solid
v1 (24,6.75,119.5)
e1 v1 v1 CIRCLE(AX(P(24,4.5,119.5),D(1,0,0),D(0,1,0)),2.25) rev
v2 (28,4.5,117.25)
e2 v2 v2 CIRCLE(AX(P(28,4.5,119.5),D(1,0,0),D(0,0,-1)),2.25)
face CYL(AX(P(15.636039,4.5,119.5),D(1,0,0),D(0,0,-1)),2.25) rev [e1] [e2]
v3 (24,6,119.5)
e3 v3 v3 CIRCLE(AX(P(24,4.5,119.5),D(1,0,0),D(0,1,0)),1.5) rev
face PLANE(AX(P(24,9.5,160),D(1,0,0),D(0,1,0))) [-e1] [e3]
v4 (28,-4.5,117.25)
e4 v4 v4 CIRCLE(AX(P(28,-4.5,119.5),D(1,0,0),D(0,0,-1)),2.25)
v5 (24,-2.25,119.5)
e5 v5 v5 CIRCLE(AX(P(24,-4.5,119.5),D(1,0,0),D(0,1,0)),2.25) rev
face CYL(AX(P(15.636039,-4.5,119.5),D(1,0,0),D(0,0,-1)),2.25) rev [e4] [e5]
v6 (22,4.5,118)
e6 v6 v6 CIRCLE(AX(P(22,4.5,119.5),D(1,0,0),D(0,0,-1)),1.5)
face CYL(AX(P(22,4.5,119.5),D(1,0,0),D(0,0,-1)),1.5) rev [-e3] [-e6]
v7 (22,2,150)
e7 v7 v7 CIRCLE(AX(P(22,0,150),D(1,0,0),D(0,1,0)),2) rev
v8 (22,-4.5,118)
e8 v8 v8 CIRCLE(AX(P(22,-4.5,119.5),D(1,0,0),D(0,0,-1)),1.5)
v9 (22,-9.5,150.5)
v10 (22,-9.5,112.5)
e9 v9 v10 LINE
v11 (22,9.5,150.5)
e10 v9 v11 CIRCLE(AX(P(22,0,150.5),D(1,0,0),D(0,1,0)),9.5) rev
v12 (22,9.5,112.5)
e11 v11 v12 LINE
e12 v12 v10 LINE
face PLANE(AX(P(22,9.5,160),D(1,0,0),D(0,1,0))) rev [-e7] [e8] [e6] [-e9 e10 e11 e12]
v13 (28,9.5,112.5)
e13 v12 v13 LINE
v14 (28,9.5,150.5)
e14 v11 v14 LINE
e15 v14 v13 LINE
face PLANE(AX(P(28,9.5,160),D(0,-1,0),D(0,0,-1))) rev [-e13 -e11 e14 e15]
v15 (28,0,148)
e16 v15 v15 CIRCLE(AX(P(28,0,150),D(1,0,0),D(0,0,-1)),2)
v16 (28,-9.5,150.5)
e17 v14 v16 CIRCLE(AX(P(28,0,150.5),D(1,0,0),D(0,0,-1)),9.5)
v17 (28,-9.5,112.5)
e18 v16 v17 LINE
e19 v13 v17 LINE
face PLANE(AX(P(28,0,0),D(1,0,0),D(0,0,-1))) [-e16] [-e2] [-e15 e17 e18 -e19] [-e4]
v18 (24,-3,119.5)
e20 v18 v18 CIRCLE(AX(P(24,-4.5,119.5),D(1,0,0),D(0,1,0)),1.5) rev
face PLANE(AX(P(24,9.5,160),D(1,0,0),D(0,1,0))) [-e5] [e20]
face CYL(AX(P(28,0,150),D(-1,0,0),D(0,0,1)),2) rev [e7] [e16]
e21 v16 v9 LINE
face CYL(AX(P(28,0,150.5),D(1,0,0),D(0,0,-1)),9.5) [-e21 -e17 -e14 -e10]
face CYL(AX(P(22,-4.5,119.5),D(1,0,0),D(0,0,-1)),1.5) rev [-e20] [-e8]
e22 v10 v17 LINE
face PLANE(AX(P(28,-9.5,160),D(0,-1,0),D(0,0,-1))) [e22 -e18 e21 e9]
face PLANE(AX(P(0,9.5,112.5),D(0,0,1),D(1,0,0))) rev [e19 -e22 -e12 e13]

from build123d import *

# Parameters (mm, degrees)
SKETCH_1_W            = 250
SKETCH_1_H            = 29
SKETCH_1_W_2          = 30
SKETCH_1_H_2          = 15
EXTRUDE_1_DEPTH       = 28
SKETCH_1_3_R          = 2
CUT_EXTRUDE_1_DEPTH   = 132.450561049
CUT_EXTRUDE_START     = 2
SKETCH_1_5_R          = 2
CUT_EXTRUDE_2_DEPTH   = 24
SKETCH_3_W            = 6
SKETCH_3_H            = 19
EXTRUDE_2_DEPTH       = 35
SKETCH_3_3_W          = 6
SKETCH_3_3_H          = 19
EXTRUDE_3_DEPTH       = 35
SKETCH_1_6_R          = 2
CUT_EXTRUDE_3_DEPTH   = 166.088612569
CUT_EXTRUDE_7_REACH   = 167.089
SKETCH_1_8_R          = 3.1
FILLET_1_R            = 9.5
FILLET_2_R            = 5
SKETCH_4_R            = 5.1
CUT_EXTRUDE_4_DEPTH   = 31.5
SKETCH_4_2_OUTSIDE_W  = 87.946
SKETCH_4_2_OUTSIDE_H  = 103.946
SKETCH_4_2_OUTSIDE_R  = 5.1
CUT_EXTRUDE_5_DEPTH   = 21.5
SKETCH_5_OUTSIDE_W    = 83.722
SKETCH_5_OUTSIDE_H    = 99.722
SKETCH_5_OUTSIDE_W_2  = 23.8
SKETCH_5_OUTSIDE_H_2  = 24.8
CUT_EXTRUDE_6_DEPTH   = 18
SKETCH_6_R            = 0.75
CUT_EXTRUDE_8_DEPTH   = 4
SKETCH_7_R            = 0.75
CUT_EXTRUDE_9_DEPTH   = 4
SKETCH_8_R            = 0.75
CUT_EXTRUDE_10_DEPTH  = 4
SKETCH_9_R            = 0.75
CUT_EXTRUDE_11_DEPTH  = 4
SKETCH_11_R           = 0.75
CUT_EXTRUDE_12_DEPTH  = 166.088612569
SKETCH_10_R           = 2
CUT_EXTRUDE_14_DEPTH  = 166.088612569
SKETCH_10_5_R         = 0.75
CUT_EXTRUDE_15_DEPTH  = 4.1
CUT_EXTRUDE_START_2   = -23.9
SKETCH_10_6_R         = 0.75
CUT_EXTRUDE_16_DEPTH  = 4.1
SKETCH_13_W           = 19.8
SKETCH_13_H           = 40
CUT_EXTRUDE_17_DEPTH  = 4.1
SKETCH_14_W           = 19.8
SKETCH_14_H           = 10
CUT_EXTRUDE_18_DEPTH  = 4.1
CUT_EXTRUDE_19_DEPTH  = 166.088612569
SKETCH_16_W           = 16
SKETCH_16_H           = 2.5
SKETCH_16_H_2         = 12.5
CUT_EXTRUDE_20_DEPTH  = 3
SKETCH_18_OUTSIDE_W   = 207.564
SKETCH_18_OUTSIDE_H   = 81.564
SKETCH_18_OUTSIDE_W_2 = 47.5
SKETCH_18_OUTSIDE_H_2 = 19
CUT_EXTRUDE_21_DEPTH  = 166.088612569
CUT_EXTRUDE_START_3   = -6
SKETCH_18_4_W         = 47.5
SKETCH_18_4_H         = 19
CUT_EXTRUDE_22_DEPTH  = 157.709096242
SKETCH_18_5_R         = 1.5
CUT_EXTRUDE_23_DEPTH  = 161.394046024
SKETCH_18_6_R         = 2.25
CUT_EXTRUDE_24_DEPTH  = 4


with BuildPart() as part:
    # 草图1 → 凸台-拉伸1 (new body)
    with BuildSketch(Plane(origin=(0, 0, 0), x_dir=(0, 0, -1), z_dir=(1, 0, 0))):
        Rectangle(SKETCH_1_W, SKETCH_1_H)
        with Locations((-60, 22)):
            Rectangle(SKETCH_1_W_2, SKETCH_1_H_2)
        with Locations((0, 22)):
            Rectangle(SKETCH_1_W_2, SKETCH_1_H_2)
        with Locations((60, 22)):
            Rectangle(SKETCH_1_W_2, SKETCH_1_H_2)
    extrude(amount=EXTRUDE_1_DEPTH)

    # 草图1<3> → 切除-拉伸1 (cut, through all)
    with BuildSketch(Plane(origin=(0, 0, 0), x_dir=(0, 0, -1), z_dir=(1, 0, 0))):
        with Locations((-67.5, -10.858617882)):
            Circle(SKETCH_1_3_R)
        with Locations((-22.5, -10.858617882)):
            Circle(SKETCH_1_3_R)
        with Locations((22.5, -10.858617882)):
            Circle(SKETCH_1_3_R)
        with Locations((-60, 25.5)):
            Circle(SKETCH_1_3_R)
        with Locations((67.5, -10.858617882)):
            Circle(SKETCH_1_3_R)
        with Locations((0, 25.5)):
            Circle(SKETCH_1_3_R)
        with Locations((60, 25.5)):
            Circle(SKETCH_1_3_R)
    extrude(amount=CUT_EXTRUDE_1_DEPTH, mode=Mode.SUBTRACT)

    # 草图1<5> → 切除-拉伸2 (cut)
    # profile 1 of 7: a face of its own
    with BuildSketch(Plane(origin=(0, 0, 0), x_dir=(0, 0, -1), z_dir=(1, 0, 0)).offset(CUT_EXTRUDE_START)):
        with BuildLine():
            Line((-72.5, 29.5), (-72.5, 25.5))
            ThreePointArc((-72.5, 25.5), (-60, 13), (-47.5, 25.5))
            Line((-47.5, 25.5), (-47.5, 29.5))
            Line((-47.5, 29.5), (-72.5, 29.5))
        make_face()
        with Locations((-60, 25.5)):
            Circle(SKETCH_1_5_R, mode=Mode.SUBTRACT)
    # profile 2 of 7: a face of its own
    with BuildSketch(Plane(origin=(0, 0, 0), x_dir=(0, 0, -1), z_dir=(1, 0, 0)).offset(CUT_EXTRUDE_START)):
        with BuildLine():
            Line((-79.457856675, -14.5), (-55.542143325, -14.5))
            ThreePointArc((-55.542143325, -14.5), (-67.5, 1.641382118), (-79.457856675, -14.5))
        make_face()
        with Locations((-67.5, -10.858617882)):
            Circle(SKETCH_1_5_R, mode=Mode.SUBTRACT)
    # profile 3 of 7: a face of its own
    with BuildSketch(Plane(origin=(0, 0, 0), x_dir=(0, 0, -1), z_dir=(1, 0, 0)).offset(CUT_EXTRUDE_START)):
        with BuildLine():
            Line((-34.457856675, -14.5), (-10.542143325, -14.5))
            ThreePointArc((-10.542143325, -14.5), (-22.5, 1.641382118), (-34.457856675, -14.5))
        make_face()
        with Locations((-22.5, -10.858617882)):
            Circle(SKETCH_1_5_R, mode=Mode.SUBTRACT)
    # profile 4 of 7: a face of its own
    with BuildSketch(Plane(origin=(0, 0, 0), x_dir=(0, 0, -1), z_dir=(1, 0, 0)).offset(CUT_EXTRUDE_START)):
        with BuildLine():
            ThreePointArc((-12.5, 25.5), (0, 13), (12.5, 25.5))
            Line((12.5, 25.5), (12.5, 29.5))
            Line((12.5, 29.5), (-12.5, 29.5))
            Line((-12.5, 29.5), (-12.5, 25.5))
        make_face()
        with Locations((0, 25.5)):
            Circle(SKETCH_1_5_R, mode=Mode.SUBTRACT)
    # profile 5 of 7: a face of its own
    with BuildSketch(Plane(origin=(0, 0, 0), x_dir=(0, 0, -1), z_dir=(1, 0, 0)).offset(CUT_EXTRUDE_START)):
        with BuildLine():
            Line((10.542143325, -14.5), (34.457856675, -14.5))
            ThreePointArc((34.457856675, -14.5), (22.5, 1.641382118), (10.542143325, -14.5))
        make_face()
        with Locations((22.5, -10.858617882)):
            Circle(SKETCH_1_5_R, mode=Mode.SUBTRACT)
    # profile 6 of 7: a face of its own
    with BuildSketch(Plane(origin=(0, 0, 0), x_dir=(0, 0, -1), z_dir=(1, 0, 0)).offset(CUT_EXTRUDE_START)):
        with BuildLine():
            Line((55.542143325, -14.5), (79.457856675, -14.5))
            ThreePointArc((79.457856675, -14.5), (67.5, 1.641382118), (55.542143325, -14.5))
        make_face()
        with Locations((67.5, -10.858617882)):
            Circle(SKETCH_1_5_R, mode=Mode.SUBTRACT)
    # profile 7 of 7: a face of its own
    with BuildSketch(Plane(origin=(0, 0, 0), x_dir=(0, 0, -1), z_dir=(1, 0, 0)).offset(CUT_EXTRUDE_START)):
        with BuildLine():
            ThreePointArc((47.5, 25.5), (60, 13), (72.5, 25.5))
            Line((72.5, 25.5), (72.5, 29.5))
            Line((72.5, 29.5), (47.5, 29.5))
            Line((47.5, 29.5), (47.5, 25.5))
        make_face()
        with Locations((60, 25.5)):
            Circle(SKETCH_1_5_R, mode=Mode.SUBTRACT)
    extrude(amount=CUT_EXTRUDE_2_DEPTH, mode=Mode.SUBTRACT)

    # 草图3 → 凸台-拉伸2 (add)
    with BuildSketch(Plane.XY.offset(125)):
        with Locations((25, 0)):
            Rectangle(SKETCH_3_W, SKETCH_3_H)
    extrude(amount=EXTRUDE_2_DEPTH)

    # 草图3<3> → 凸台-拉伸3 (add)
    with BuildSketch(Plane.XY.offset(125)):
        with Locations((25, 0)):
            Rectangle(SKETCH_3_3_W, SKETCH_3_3_H)
        with Locations((3, 0)):
            Rectangle(SKETCH_3_3_W, SKETCH_3_3_H)
    extrude(amount=EXTRUDE_3_DEPTH)

    # 草图1<6> → 切除-拉伸3 (cut, through all)
    with BuildSketch(Plane(origin=(0, 0, 0), x_dir=(0, 0, -1), z_dir=(1, 0, 0))):
        with Locations(Location((-150, 0, 0), (0, 0, 90))):
            Circle(SKETCH_1_6_R)
    extrude(amount=CUT_EXTRUDE_3_DEPTH, mode=Mode.SUBTRACT)

    # 草图1<8> → 切除-拉伸7 (cut, up to next)
    with BuildSketch(Plane(origin=(0, 0, 0), x_dir=(0, 0, -1), z_dir=(1, 0, 0)), mode=Mode.PRIVATE) as cut_extrude_7_sk1:
        with Locations(Location((-150, 0, 0), (0, 0, 180))):
            Circle(SKETCH_1_8_R)
    cut_extrude_7_tool1 = extrude(cut_extrude_7_sk1.sketch, amount=CUT_EXTRUDE_7_REACH, mode=Mode.PRIVATE) & part.part
    add(cut_extrude_7_tool1.solids().sort_by_distance((0, 0, 150))[0], mode=Mode.SUBTRACT)

    # 圆角1
    fillet_1_edges = [part.edges().sort_by_distance(p)[0] for p in [
        (25, 9.5, 160),
        (25, -9.5, 160),
        (3, -9.5, 160),
        (3, 9.5, 160),
    ]]
    fillet(fillet_1_edges, radius=FILLET_1_R - 0.0001)  # a hair under: the kernel refuses the full size

    # 圆角2
    fillet_2_edges = [part.edges().sort_by_distance(p)[0] for p in [
        (14, -14.5, 125),
        (14, 14.5, 125),
    ]]
    fillet(fillet_2_edges, radius=FILLET_2_R)

    # 草图4 → 切除-拉伸4 (cut)
    with BuildSketch(Plane(origin=(0, 0, -125), x_dir=(-1, 0, 0), z_dir=(0, 0, -1))):
        with Locations((-14, 0)):
            Circle(SKETCH_4_R)
    extrude(amount=-CUT_EXTRUDE_4_DEPTH, mode=Mode.SUBTRACT)

    # 草图4<2> outside → 切除-拉伸5 (cut)
    with BuildSketch(Plane(origin=(0, 0, -125), x_dir=(-1, 0, 0), z_dir=(0, 0, -1))):
        with Locations((-14, 7.5)):
            Rectangle(SKETCH_4_2_OUTSIDE_W, SKETCH_4_2_OUTSIDE_H)
        with Locations((-14, 0)):
            Circle(SKETCH_4_2_OUTSIDE_R, mode=Mode.SUBTRACT)
    extrude(amount=-CUT_EXTRUDE_5_DEPTH, mode=Mode.SUBTRACT)

    # 草图5 outside → 切除-拉伸6 (cut)
    with BuildSketch(Plane(origin=(0, 0, -103.5), x_dir=(-1, 0, 0), z_dir=(0, 0, -1))):
        with Locations((-14, 7.5)):
            Rectangle(SKETCH_5_OUTSIDE_W, SKETCH_5_OUTSIDE_H)
        with Locations((-14, 0)):
            Rectangle(SKETCH_5_OUTSIDE_W_2, SKETCH_5_OUTSIDE_H_2, mode=Mode.SUBTRACT)
    extrude(amount=-CUT_EXTRUDE_6_DEPTH, mode=Mode.SUBTRACT)

    # 草图6 → 切除-拉伸8 (cut)
    with BuildSketch(Plane(origin=(0, 14.5, 0), x_dir=(1, 0, 0), z_dir=(0, 1, 0))):
        with Locations(Location((7, 23.5, 0), (0, 0, 270))):
            Circle(SKETCH_6_R)
        with Locations(Location((21, 35.5, 0), (0, 0, 270))):
            Circle(SKETCH_6_R)
        with Locations(Location((7, -23.5, 0), (0, 0, 270))):
            Circle(SKETCH_6_R)
        with Locations(Location((21, -35.5, 0), (0, 0, 270))):
            Circle(SKETCH_6_R)
    extrude(amount=-CUT_EXTRUDE_8_DEPTH, mode=Mode.SUBTRACT)

    # 草图7 → 切除-拉伸9 (cut)
    with BuildSketch(Plane(origin=(0, 14.5, 0), x_dir=(1, 0, 0), z_dir=(0, 1, 0))):
        with Locations(Location((7, -89.5, 0), (0, 0, 270))):
            Circle(SKETCH_7_R)
        with Locations(Location((21.2, -110.5, 0), (0, 0, 270))):
            Circle(SKETCH_7_R)
    extrude(amount=-CUT_EXTRUDE_9_DEPTH, mode=Mode.SUBTRACT)

    # 草图8 → 切除-拉伸10 (cut)
    with BuildSketch(Plane.ZY):
        with Locations((47, 4)):
            Circle(SKETCH_8_R)
        with Locations((2.499047641, -1.5)):
            Circle(SKETCH_8_R)
    extrude(amount=-CUT_EXTRUDE_10_DEPTH, mode=Mode.SUBTRACT)

    # 草图9 → 切除-拉伸11 (cut)
    with BuildSketch(Plane(origin=(28, 0, 0), x_dir=(0, 0, -1), z_dir=(1, 0, 0))):
        with Locations((-107.5, -0.5)):
            Circle(SKETCH_9_R)
        with Locations((-92.5, -0.5)):
            Circle(SKETCH_9_R)
    extrude(amount=-CUT_EXTRUDE_11_DEPTH, mode=Mode.SUBTRACT)

    # 草图11 → 切除-拉伸12 (cut, through all)
    with BuildSketch(Plane(origin=(0, 0, 0), x_dir=(0, 0, -1), z_dir=(1, 0, 0))):
        with Locations((-14.530122053, 6.5)):
            Circle(SKETCH_11_R)
        with Locations((-1.081846191, -6.5)):
            Circle(SKETCH_11_R)
        with Locations((5.469877947, 6.5)):
            Circle(SKETCH_11_R)
    extrude(amount=CUT_EXTRUDE_12_DEPTH, mode=Mode.SUBTRACT)

    # 草图10 → 切除-拉伸14 (cut, through all)
    # profile 1 of 2: a face of its own
    with BuildSketch(Plane.ZY):
        Polygon((15, 14.5), (30, 14.5), (30, 45.542128626), (-140.458536671, 45.542128626), (-140.458536671, -65.636075395), (-10, -65.636075395), (-10, -14.5), (-85.5, -14.5), (-85.5, 14.5), (-75, 14.5), (-75, 29.5), (-45, 29.5), (-45, 14.5), (-15, 14.5), (-15, 29.5), (15, 29.5), align=None)
    # profile 2 of 2: a face of its own
    with BuildSketch(Plane.ZY):
        Polygon((-10, 14.5), (15, 14.5), (15, 29.5), (-15, 29.5), (-15, 14.5), (-45, 14.5), (-45, 29.5), (-75, 29.5), (-75, 14.5), (-85.5, 14.5), (-85.5, -14.5), (-10, -14.5), align=None)
        with Locations((-67.5, -10.858617882)):
            Circle(SKETCH_10_R, mode=Mode.SUBTRACT)
        with Locations((-22.5, -10.858617882)):
            Circle(SKETCH_10_R, mode=Mode.SUBTRACT)
        with Locations((-60, 25.5)):
            Circle(SKETCH_10_R, mode=Mode.SUBTRACT)
        with Locations((0, 25.5)):
            Circle(SKETCH_10_R, mode=Mode.SUBTRACT)
    extrude(amount=-CUT_EXTRUDE_14_DEPTH, mode=Mode.SUBTRACT)

    # 草图10<5> → 切除-拉伸15 (cut)
    with BuildSketch(Plane.ZY):
        Polygon((0, -14.5), (30, 14.5), (15, 14.5), (-10, 14.5), (-10, -14.5), align=None)
        with Locations((2.499047641, -1.5)):
            Circle(SKETCH_10_5_R, mode=Mode.SUBTRACT)
    extrude(amount=-CUT_EXTRUDE_15_DEPTH, mode=Mode.SUBTRACT)

    # 草图10<6> → 切除-拉伸16 (cut)
    # profile 1 of 2: a face of its own
    with BuildSketch(Plane.ZY.offset(CUT_EXTRUDE_START_2)):
        Polygon((0, -14.5), (30, 14.5), (15, 14.5), (-10, 14.5), (-10, -14.5), align=None)
        with Locations((2.499047641, -1.5)):
            Circle(SKETCH_10_6_R, mode=Mode.SUBTRACT)
    # profile 2 of 2: a face of its own
    with BuildSketch(Plane.ZY.offset(CUT_EXTRUDE_START_2)):
        with Locations((2.499047641, -1.5)):
            Circle(SKETCH_10_6_R)
    extrude(amount=-CUT_EXTRUDE_16_DEPTH, mode=Mode.SUBTRACT)

    # 草图13 → 切除-拉伸17 (cut)
    with BuildSketch(Plane(origin=(0, 14.5, 0), x_dir=(1, 0, 0), z_dir=(0, 1, 0))):
        with Locations((14, -10)):
            Rectangle(SKETCH_13_W, SKETCH_13_H)
    extrude(amount=-CUT_EXTRUDE_17_DEPTH, mode=Mode.SUBTRACT)

    # 草图14 → 切除-拉伸18 (cut)
    with BuildSketch(Plane.XZ.offset(14.5)):
        with Locations((14, -5)):
            Rectangle(SKETCH_14_W, SKETCH_14_H)
    extrude(amount=-CUT_EXTRUDE_18_DEPTH, mode=Mode.SUBTRACT)

    # 草图15 → 切除-拉伸19 (cut, through all)
    with BuildSketch(Plane.ZY):
        Polygon((0, -10.4), (0, -14.5), (4.24137931, -10.4), align=None)
    extrude(amount=-CUT_EXTRUDE_19_DEPTH, mode=Mode.SUBTRACT)

    # 草图16 → 切除-拉伸20 (cut)
    with BuildSketch(Plane(origin=(0, 29.5, 0), x_dir=(1, 0, 0), z_dir=(0, 1, 0))):
        with Locations((14, -76.25)):
            Rectangle(SKETCH_16_W, SKETCH_16_H)
        with Locations((14, -73.75)):
            Rectangle(SKETCH_16_W, SKETCH_16_H)
        with Locations((14, -66.25)):
            Rectangle(SKETCH_16_W, SKETCH_16_H_2)
    extrude(amount=-CUT_EXTRUDE_20_DEPTH, mode=Mode.SUBTRACT)

    # 草图18 outside → 切除-拉伸21 (cut, through all)
    with BuildSketch(Plane(origin=(28, 0, 0), x_dir=(0, 0, -1), z_dir=(1, 0, 0))):
        with Locations((-75, 7.5)):
            Rectangle(SKETCH_18_OUTSIDE_W, SKETCH_18_OUTSIDE_H)
        with Locations((-136.25, 0)):
            Rectangle(SKETCH_18_OUTSIDE_W_2, SKETCH_18_OUTSIDE_H_2, mode=Mode.SUBTRACT)
    extrude(amount=-CUT_EXTRUDE_21_DEPTH, mode=Mode.SUBTRACT)

    # 草图18<4> → 切除-拉伸22 (cut, through all)
    with BuildSketch(Plane(origin=(28, 0, 0), x_dir=(0, 0, -1), z_dir=(1, 0, 0)).offset(CUT_EXTRUDE_START_3)):
        with Locations((-136.25, 0)):
            Rectangle(SKETCH_18_4_W, SKETCH_18_4_H)
    extrude(amount=-CUT_EXTRUDE_22_DEPTH, mode=Mode.SUBTRACT)

    # 草图18<5> → 切除-拉伸23 (cut, through all)
    with BuildSketch(Plane(origin=(28, 0, 0), x_dir=(0, 0, -1), z_dir=(1, 0, 0))):
        with Locations((-119.5, 4.5)):
            Circle(SKETCH_18_5_R)
        with Locations((-119.5, -4.5)):
            Circle(SKETCH_18_5_R)
    extrude(amount=-CUT_EXTRUDE_23_DEPTH, mode=Mode.SUBTRACT)

    # 草图18<6> → 切除-拉伸24 (cut)
    with BuildSketch(Plane(origin=(28, 0, 0), x_dir=(0, 0, -1), z_dir=(1, 0, 0))):
        with Locations((-119.5, 4.5)):
            Circle(SKETCH_18_6_R)
        with Locations((-119.5, -4.5)):
            Circle(SKETCH_18_6_R)
    extrude(amount=-CUT_EXTRUDE_24_DEPTH, mode=Mode.SUBTRACT)


solid = part.part
